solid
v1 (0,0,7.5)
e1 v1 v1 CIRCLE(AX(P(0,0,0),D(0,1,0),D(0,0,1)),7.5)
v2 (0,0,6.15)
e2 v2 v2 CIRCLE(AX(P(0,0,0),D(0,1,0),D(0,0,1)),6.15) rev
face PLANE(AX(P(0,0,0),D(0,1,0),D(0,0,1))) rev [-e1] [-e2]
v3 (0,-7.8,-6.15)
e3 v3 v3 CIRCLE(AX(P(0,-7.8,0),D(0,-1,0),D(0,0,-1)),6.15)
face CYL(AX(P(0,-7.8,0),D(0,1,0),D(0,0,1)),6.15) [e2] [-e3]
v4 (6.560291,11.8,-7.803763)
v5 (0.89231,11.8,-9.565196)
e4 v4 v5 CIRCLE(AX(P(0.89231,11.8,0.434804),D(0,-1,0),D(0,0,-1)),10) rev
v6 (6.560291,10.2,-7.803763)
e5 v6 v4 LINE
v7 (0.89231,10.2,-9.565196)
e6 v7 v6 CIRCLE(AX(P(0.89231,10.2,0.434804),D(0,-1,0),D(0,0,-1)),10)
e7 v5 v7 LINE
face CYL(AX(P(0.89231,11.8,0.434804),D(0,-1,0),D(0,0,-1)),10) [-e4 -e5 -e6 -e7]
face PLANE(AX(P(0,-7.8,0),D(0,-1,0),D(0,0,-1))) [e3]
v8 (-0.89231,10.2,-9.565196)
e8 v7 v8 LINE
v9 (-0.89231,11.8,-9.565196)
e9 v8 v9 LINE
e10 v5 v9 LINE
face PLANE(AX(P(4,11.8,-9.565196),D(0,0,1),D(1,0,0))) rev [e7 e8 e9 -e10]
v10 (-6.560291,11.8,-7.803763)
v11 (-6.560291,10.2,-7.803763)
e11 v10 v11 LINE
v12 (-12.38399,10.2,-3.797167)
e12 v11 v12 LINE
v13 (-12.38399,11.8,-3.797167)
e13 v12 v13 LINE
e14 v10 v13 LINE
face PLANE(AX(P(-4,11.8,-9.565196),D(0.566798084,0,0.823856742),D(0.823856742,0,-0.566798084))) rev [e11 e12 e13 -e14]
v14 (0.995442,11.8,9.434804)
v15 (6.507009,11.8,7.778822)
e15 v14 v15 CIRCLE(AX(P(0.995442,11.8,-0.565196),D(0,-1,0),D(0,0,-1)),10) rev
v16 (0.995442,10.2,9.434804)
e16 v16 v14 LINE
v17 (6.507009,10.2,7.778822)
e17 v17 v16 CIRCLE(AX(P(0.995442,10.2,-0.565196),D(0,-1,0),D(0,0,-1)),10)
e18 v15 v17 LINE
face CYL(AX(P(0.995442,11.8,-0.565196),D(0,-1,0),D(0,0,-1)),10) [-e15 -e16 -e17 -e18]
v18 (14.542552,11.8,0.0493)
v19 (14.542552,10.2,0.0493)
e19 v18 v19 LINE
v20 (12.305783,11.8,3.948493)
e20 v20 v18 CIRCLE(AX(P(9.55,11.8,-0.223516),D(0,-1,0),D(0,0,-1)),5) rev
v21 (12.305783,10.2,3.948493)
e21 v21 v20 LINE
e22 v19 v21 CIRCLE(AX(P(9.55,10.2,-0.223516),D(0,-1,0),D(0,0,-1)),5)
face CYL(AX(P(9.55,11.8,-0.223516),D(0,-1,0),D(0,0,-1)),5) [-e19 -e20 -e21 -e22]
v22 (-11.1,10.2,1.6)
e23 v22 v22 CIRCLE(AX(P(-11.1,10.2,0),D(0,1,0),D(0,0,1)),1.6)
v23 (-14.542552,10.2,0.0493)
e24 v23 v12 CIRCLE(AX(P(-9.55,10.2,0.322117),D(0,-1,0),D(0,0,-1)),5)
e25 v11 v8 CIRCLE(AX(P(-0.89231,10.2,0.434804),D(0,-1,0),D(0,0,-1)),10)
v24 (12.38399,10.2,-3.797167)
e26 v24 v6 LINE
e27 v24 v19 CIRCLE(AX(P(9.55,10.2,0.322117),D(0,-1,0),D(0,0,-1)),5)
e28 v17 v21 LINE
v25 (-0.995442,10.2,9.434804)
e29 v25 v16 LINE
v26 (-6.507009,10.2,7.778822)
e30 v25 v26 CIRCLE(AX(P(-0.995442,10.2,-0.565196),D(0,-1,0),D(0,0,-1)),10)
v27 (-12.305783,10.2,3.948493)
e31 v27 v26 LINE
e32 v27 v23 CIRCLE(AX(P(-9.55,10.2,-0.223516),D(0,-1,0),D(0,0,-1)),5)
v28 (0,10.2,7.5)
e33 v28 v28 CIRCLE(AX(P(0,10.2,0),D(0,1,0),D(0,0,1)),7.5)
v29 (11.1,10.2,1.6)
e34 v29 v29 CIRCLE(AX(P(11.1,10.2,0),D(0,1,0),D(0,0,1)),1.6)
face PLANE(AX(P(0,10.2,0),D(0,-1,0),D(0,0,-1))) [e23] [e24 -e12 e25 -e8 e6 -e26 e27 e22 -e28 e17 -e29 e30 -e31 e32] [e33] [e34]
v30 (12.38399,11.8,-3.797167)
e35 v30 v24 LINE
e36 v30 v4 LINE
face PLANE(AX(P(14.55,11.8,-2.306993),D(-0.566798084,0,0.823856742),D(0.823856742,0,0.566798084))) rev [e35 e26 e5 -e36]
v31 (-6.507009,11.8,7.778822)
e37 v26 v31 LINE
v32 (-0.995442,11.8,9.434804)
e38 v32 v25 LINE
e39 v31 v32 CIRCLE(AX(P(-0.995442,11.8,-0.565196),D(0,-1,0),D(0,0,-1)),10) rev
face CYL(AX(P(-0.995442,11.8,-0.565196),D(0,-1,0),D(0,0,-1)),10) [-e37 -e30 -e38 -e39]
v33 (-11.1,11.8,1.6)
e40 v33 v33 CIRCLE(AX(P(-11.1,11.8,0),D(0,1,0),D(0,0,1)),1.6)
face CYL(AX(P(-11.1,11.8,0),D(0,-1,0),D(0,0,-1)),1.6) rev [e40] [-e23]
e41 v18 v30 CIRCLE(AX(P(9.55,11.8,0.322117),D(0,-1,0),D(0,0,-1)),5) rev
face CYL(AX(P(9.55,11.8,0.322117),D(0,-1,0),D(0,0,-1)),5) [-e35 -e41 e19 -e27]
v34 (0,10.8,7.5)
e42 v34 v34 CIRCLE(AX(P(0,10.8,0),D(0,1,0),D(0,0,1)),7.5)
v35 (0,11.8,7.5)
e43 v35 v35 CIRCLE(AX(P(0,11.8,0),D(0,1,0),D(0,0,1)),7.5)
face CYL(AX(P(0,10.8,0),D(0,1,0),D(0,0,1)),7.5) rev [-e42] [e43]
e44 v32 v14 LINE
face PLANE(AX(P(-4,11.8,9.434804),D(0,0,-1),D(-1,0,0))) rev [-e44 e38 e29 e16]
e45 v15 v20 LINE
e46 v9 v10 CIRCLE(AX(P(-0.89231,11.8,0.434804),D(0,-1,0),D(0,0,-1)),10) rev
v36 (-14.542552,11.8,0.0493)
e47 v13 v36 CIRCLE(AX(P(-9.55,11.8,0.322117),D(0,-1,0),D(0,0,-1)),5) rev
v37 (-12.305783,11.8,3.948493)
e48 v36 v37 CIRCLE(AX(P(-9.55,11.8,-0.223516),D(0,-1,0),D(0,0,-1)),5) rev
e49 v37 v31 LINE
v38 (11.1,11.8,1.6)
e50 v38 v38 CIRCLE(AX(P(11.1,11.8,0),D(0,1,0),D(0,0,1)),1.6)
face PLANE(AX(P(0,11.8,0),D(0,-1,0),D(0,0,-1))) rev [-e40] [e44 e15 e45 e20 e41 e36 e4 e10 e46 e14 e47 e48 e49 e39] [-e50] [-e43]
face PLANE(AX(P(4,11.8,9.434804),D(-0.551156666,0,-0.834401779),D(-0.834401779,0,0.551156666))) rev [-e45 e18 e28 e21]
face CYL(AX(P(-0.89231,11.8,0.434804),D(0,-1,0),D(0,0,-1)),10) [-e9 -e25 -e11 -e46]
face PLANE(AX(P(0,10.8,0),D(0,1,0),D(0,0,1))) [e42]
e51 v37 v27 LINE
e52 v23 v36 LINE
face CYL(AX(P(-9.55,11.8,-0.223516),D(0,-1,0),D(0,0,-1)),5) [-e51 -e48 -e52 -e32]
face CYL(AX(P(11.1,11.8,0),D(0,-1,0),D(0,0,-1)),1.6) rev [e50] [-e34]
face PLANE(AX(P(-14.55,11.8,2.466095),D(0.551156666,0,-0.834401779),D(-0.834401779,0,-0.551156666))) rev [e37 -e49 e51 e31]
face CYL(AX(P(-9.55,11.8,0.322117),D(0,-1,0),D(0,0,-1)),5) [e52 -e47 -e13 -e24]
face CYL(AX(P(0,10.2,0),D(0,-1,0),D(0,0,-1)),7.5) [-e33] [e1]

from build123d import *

# Parameters (mm, degrees)
SKETCH1_R           = 7.5
BOSS_EXTRUDE1_DEPTH = 10.2
SKETCH2_R           = 1.6
BOSS_EXTRUDE2_DEPTH = 1.6
SKETCH3_R           = 6.15
BOSS_EXTRUDE3_DEPTH = 7.8
CUT_EXTRUDE1_START  = -1
SKETCH4_R           = 7.5
CUT_EXTRUDE1_DEPTH  = 1
FILLET1_R           = 5
FILLET2_R           = 10


with BuildPart() as part:
    # Sketch1 → Boss-Extrude1 (new body)
    with BuildSketch(Plane(origin=(0, 0, 0), x_dir=(1, 0, 0), z_dir=(0, 1, 0))):
        with Locations(Location((0, 0, 0), (0, 0, 270))):
            Circle(SKETCH1_R)
    extrude(amount=BOSS_EXTRUDE1_DEPTH)

    # Sketch2 → Boss-Extrude2 (add)
    with BuildSketch(Plane(origin=(0, 10.2, 0), x_dir=(1, 0, 0), z_dir=(0, 1, 0))):
        Polygon((-14.55, 2.306992561), (-14.55, -2.466095496), (-4, -9.43480406), (4, -9.43480406), (14.55, -2.466095496), (14.55, 2.306992561), (4, 9.56519594), (-4, 9.56519594), align=None)
        with Locations(Location((-11.1, 0, 0), (0, 0, 270))):
            Circle(SKETCH2_R, mode=Mode.SUBTRACT)
        with Locations(Location((11.1, 0, 0), (0, 0, 270))):
            Circle(SKETCH2_R, mode=Mode.SUBTRACT)
    extrude(amount=BOSS_EXTRUDE2_DEPTH)

    # Sketch3 → Boss-Extrude3 (add)
    with BuildSketch(Plane.XZ):
        with Locations(Location((0, 0, 0), (0, 0, 90))):
            Circle(SKETCH3_R)
    extrude(amount=BOSS_EXTRUDE3_DEPTH)

    # Sketch4 → Cut-Extrude1 (cut)
    with BuildSketch(Plane(origin=(0, 11.8, 0), x_dir=(1, 0, 0), z_dir=(0, 1, 0)).offset(CUT_EXTRUDE1_START)):
        with Locations(Location((0, 0, 0), (0, 0, 270))):
            Circle(SKETCH4_R)
    extrude(amount=CUT_EXTRUDE1_DEPTH, mode=Mode.SUBTRACT)

    # Fillet1
    # the kernel refuses this fillet: 5 mm, written as the material it takes off along each edge
    with BuildSketch(Plane(origin=(14.55, 3.627226277, -2.306992561), x_dir=(-0.8238567421682754, 0, -0.5667980843156368), z_dir=(0, 1, 0)), Plane(origin=(-14.55, 3.627226277, -2.306992561), x_dir=(0, 0, 1), z_dir=(0, 1, 0))) as fillet1_piece_1:
        with BuildLine():
            CenterArc((FILLET1_R * 0.525821897803, FILLET1_R), FILLET1_R, 214.527246886, 55.472753114)
            Line((-FILLET1_R * 0.298034844366, FILLET1_R * 0.433201915684), (0, 0))
            Line((0, 0), (FILLET1_R * 0.525821897803, 0))
        make_face()
    extrude(amount=14.745547445, mode=Mode.SUBTRACT)
    with BuildSketch(Plane(origin=(14.55, 3.475971105, 2.466095496), x_dir=(-0.8344017794446341, 0, 0.5511566659849338), z_dir=(0, 1, 0)), Plane(origin=(-14.55, 3.475971105, 2.466095496), x_dir=(0, 0, -1), z_dir=(0, 1, 0))) as fillet1_piece_2:
        with BuildLine():
            CenterArc((FILLET1_R * 0.537922311616, -FILLET1_R), FILLET1_R, 90, 56.553598673)
            Line((-FILLET1_R * 0.296479467829, -FILLET1_R * 0.448843334015), (0, 0))
            Line((0, 0), (FILLET1_R * 0.537922311616, 0))
        make_face()
    extrude(amount=15.04805779, mode=Mode.SUBTRACT)

    # Fillet2
    fillet2_edges = [part.edges().sort_by_distance(p)[0] for p in [
        (-4, 11, 9.43480406),
        (4, 11, 9.43480406),
        (4, 11, -9.56519594),
        (-4, 11, -9.56519594),
    ]]
    fillet(fillet2_edges, radius=FILLET2_R)


solid = part.part
